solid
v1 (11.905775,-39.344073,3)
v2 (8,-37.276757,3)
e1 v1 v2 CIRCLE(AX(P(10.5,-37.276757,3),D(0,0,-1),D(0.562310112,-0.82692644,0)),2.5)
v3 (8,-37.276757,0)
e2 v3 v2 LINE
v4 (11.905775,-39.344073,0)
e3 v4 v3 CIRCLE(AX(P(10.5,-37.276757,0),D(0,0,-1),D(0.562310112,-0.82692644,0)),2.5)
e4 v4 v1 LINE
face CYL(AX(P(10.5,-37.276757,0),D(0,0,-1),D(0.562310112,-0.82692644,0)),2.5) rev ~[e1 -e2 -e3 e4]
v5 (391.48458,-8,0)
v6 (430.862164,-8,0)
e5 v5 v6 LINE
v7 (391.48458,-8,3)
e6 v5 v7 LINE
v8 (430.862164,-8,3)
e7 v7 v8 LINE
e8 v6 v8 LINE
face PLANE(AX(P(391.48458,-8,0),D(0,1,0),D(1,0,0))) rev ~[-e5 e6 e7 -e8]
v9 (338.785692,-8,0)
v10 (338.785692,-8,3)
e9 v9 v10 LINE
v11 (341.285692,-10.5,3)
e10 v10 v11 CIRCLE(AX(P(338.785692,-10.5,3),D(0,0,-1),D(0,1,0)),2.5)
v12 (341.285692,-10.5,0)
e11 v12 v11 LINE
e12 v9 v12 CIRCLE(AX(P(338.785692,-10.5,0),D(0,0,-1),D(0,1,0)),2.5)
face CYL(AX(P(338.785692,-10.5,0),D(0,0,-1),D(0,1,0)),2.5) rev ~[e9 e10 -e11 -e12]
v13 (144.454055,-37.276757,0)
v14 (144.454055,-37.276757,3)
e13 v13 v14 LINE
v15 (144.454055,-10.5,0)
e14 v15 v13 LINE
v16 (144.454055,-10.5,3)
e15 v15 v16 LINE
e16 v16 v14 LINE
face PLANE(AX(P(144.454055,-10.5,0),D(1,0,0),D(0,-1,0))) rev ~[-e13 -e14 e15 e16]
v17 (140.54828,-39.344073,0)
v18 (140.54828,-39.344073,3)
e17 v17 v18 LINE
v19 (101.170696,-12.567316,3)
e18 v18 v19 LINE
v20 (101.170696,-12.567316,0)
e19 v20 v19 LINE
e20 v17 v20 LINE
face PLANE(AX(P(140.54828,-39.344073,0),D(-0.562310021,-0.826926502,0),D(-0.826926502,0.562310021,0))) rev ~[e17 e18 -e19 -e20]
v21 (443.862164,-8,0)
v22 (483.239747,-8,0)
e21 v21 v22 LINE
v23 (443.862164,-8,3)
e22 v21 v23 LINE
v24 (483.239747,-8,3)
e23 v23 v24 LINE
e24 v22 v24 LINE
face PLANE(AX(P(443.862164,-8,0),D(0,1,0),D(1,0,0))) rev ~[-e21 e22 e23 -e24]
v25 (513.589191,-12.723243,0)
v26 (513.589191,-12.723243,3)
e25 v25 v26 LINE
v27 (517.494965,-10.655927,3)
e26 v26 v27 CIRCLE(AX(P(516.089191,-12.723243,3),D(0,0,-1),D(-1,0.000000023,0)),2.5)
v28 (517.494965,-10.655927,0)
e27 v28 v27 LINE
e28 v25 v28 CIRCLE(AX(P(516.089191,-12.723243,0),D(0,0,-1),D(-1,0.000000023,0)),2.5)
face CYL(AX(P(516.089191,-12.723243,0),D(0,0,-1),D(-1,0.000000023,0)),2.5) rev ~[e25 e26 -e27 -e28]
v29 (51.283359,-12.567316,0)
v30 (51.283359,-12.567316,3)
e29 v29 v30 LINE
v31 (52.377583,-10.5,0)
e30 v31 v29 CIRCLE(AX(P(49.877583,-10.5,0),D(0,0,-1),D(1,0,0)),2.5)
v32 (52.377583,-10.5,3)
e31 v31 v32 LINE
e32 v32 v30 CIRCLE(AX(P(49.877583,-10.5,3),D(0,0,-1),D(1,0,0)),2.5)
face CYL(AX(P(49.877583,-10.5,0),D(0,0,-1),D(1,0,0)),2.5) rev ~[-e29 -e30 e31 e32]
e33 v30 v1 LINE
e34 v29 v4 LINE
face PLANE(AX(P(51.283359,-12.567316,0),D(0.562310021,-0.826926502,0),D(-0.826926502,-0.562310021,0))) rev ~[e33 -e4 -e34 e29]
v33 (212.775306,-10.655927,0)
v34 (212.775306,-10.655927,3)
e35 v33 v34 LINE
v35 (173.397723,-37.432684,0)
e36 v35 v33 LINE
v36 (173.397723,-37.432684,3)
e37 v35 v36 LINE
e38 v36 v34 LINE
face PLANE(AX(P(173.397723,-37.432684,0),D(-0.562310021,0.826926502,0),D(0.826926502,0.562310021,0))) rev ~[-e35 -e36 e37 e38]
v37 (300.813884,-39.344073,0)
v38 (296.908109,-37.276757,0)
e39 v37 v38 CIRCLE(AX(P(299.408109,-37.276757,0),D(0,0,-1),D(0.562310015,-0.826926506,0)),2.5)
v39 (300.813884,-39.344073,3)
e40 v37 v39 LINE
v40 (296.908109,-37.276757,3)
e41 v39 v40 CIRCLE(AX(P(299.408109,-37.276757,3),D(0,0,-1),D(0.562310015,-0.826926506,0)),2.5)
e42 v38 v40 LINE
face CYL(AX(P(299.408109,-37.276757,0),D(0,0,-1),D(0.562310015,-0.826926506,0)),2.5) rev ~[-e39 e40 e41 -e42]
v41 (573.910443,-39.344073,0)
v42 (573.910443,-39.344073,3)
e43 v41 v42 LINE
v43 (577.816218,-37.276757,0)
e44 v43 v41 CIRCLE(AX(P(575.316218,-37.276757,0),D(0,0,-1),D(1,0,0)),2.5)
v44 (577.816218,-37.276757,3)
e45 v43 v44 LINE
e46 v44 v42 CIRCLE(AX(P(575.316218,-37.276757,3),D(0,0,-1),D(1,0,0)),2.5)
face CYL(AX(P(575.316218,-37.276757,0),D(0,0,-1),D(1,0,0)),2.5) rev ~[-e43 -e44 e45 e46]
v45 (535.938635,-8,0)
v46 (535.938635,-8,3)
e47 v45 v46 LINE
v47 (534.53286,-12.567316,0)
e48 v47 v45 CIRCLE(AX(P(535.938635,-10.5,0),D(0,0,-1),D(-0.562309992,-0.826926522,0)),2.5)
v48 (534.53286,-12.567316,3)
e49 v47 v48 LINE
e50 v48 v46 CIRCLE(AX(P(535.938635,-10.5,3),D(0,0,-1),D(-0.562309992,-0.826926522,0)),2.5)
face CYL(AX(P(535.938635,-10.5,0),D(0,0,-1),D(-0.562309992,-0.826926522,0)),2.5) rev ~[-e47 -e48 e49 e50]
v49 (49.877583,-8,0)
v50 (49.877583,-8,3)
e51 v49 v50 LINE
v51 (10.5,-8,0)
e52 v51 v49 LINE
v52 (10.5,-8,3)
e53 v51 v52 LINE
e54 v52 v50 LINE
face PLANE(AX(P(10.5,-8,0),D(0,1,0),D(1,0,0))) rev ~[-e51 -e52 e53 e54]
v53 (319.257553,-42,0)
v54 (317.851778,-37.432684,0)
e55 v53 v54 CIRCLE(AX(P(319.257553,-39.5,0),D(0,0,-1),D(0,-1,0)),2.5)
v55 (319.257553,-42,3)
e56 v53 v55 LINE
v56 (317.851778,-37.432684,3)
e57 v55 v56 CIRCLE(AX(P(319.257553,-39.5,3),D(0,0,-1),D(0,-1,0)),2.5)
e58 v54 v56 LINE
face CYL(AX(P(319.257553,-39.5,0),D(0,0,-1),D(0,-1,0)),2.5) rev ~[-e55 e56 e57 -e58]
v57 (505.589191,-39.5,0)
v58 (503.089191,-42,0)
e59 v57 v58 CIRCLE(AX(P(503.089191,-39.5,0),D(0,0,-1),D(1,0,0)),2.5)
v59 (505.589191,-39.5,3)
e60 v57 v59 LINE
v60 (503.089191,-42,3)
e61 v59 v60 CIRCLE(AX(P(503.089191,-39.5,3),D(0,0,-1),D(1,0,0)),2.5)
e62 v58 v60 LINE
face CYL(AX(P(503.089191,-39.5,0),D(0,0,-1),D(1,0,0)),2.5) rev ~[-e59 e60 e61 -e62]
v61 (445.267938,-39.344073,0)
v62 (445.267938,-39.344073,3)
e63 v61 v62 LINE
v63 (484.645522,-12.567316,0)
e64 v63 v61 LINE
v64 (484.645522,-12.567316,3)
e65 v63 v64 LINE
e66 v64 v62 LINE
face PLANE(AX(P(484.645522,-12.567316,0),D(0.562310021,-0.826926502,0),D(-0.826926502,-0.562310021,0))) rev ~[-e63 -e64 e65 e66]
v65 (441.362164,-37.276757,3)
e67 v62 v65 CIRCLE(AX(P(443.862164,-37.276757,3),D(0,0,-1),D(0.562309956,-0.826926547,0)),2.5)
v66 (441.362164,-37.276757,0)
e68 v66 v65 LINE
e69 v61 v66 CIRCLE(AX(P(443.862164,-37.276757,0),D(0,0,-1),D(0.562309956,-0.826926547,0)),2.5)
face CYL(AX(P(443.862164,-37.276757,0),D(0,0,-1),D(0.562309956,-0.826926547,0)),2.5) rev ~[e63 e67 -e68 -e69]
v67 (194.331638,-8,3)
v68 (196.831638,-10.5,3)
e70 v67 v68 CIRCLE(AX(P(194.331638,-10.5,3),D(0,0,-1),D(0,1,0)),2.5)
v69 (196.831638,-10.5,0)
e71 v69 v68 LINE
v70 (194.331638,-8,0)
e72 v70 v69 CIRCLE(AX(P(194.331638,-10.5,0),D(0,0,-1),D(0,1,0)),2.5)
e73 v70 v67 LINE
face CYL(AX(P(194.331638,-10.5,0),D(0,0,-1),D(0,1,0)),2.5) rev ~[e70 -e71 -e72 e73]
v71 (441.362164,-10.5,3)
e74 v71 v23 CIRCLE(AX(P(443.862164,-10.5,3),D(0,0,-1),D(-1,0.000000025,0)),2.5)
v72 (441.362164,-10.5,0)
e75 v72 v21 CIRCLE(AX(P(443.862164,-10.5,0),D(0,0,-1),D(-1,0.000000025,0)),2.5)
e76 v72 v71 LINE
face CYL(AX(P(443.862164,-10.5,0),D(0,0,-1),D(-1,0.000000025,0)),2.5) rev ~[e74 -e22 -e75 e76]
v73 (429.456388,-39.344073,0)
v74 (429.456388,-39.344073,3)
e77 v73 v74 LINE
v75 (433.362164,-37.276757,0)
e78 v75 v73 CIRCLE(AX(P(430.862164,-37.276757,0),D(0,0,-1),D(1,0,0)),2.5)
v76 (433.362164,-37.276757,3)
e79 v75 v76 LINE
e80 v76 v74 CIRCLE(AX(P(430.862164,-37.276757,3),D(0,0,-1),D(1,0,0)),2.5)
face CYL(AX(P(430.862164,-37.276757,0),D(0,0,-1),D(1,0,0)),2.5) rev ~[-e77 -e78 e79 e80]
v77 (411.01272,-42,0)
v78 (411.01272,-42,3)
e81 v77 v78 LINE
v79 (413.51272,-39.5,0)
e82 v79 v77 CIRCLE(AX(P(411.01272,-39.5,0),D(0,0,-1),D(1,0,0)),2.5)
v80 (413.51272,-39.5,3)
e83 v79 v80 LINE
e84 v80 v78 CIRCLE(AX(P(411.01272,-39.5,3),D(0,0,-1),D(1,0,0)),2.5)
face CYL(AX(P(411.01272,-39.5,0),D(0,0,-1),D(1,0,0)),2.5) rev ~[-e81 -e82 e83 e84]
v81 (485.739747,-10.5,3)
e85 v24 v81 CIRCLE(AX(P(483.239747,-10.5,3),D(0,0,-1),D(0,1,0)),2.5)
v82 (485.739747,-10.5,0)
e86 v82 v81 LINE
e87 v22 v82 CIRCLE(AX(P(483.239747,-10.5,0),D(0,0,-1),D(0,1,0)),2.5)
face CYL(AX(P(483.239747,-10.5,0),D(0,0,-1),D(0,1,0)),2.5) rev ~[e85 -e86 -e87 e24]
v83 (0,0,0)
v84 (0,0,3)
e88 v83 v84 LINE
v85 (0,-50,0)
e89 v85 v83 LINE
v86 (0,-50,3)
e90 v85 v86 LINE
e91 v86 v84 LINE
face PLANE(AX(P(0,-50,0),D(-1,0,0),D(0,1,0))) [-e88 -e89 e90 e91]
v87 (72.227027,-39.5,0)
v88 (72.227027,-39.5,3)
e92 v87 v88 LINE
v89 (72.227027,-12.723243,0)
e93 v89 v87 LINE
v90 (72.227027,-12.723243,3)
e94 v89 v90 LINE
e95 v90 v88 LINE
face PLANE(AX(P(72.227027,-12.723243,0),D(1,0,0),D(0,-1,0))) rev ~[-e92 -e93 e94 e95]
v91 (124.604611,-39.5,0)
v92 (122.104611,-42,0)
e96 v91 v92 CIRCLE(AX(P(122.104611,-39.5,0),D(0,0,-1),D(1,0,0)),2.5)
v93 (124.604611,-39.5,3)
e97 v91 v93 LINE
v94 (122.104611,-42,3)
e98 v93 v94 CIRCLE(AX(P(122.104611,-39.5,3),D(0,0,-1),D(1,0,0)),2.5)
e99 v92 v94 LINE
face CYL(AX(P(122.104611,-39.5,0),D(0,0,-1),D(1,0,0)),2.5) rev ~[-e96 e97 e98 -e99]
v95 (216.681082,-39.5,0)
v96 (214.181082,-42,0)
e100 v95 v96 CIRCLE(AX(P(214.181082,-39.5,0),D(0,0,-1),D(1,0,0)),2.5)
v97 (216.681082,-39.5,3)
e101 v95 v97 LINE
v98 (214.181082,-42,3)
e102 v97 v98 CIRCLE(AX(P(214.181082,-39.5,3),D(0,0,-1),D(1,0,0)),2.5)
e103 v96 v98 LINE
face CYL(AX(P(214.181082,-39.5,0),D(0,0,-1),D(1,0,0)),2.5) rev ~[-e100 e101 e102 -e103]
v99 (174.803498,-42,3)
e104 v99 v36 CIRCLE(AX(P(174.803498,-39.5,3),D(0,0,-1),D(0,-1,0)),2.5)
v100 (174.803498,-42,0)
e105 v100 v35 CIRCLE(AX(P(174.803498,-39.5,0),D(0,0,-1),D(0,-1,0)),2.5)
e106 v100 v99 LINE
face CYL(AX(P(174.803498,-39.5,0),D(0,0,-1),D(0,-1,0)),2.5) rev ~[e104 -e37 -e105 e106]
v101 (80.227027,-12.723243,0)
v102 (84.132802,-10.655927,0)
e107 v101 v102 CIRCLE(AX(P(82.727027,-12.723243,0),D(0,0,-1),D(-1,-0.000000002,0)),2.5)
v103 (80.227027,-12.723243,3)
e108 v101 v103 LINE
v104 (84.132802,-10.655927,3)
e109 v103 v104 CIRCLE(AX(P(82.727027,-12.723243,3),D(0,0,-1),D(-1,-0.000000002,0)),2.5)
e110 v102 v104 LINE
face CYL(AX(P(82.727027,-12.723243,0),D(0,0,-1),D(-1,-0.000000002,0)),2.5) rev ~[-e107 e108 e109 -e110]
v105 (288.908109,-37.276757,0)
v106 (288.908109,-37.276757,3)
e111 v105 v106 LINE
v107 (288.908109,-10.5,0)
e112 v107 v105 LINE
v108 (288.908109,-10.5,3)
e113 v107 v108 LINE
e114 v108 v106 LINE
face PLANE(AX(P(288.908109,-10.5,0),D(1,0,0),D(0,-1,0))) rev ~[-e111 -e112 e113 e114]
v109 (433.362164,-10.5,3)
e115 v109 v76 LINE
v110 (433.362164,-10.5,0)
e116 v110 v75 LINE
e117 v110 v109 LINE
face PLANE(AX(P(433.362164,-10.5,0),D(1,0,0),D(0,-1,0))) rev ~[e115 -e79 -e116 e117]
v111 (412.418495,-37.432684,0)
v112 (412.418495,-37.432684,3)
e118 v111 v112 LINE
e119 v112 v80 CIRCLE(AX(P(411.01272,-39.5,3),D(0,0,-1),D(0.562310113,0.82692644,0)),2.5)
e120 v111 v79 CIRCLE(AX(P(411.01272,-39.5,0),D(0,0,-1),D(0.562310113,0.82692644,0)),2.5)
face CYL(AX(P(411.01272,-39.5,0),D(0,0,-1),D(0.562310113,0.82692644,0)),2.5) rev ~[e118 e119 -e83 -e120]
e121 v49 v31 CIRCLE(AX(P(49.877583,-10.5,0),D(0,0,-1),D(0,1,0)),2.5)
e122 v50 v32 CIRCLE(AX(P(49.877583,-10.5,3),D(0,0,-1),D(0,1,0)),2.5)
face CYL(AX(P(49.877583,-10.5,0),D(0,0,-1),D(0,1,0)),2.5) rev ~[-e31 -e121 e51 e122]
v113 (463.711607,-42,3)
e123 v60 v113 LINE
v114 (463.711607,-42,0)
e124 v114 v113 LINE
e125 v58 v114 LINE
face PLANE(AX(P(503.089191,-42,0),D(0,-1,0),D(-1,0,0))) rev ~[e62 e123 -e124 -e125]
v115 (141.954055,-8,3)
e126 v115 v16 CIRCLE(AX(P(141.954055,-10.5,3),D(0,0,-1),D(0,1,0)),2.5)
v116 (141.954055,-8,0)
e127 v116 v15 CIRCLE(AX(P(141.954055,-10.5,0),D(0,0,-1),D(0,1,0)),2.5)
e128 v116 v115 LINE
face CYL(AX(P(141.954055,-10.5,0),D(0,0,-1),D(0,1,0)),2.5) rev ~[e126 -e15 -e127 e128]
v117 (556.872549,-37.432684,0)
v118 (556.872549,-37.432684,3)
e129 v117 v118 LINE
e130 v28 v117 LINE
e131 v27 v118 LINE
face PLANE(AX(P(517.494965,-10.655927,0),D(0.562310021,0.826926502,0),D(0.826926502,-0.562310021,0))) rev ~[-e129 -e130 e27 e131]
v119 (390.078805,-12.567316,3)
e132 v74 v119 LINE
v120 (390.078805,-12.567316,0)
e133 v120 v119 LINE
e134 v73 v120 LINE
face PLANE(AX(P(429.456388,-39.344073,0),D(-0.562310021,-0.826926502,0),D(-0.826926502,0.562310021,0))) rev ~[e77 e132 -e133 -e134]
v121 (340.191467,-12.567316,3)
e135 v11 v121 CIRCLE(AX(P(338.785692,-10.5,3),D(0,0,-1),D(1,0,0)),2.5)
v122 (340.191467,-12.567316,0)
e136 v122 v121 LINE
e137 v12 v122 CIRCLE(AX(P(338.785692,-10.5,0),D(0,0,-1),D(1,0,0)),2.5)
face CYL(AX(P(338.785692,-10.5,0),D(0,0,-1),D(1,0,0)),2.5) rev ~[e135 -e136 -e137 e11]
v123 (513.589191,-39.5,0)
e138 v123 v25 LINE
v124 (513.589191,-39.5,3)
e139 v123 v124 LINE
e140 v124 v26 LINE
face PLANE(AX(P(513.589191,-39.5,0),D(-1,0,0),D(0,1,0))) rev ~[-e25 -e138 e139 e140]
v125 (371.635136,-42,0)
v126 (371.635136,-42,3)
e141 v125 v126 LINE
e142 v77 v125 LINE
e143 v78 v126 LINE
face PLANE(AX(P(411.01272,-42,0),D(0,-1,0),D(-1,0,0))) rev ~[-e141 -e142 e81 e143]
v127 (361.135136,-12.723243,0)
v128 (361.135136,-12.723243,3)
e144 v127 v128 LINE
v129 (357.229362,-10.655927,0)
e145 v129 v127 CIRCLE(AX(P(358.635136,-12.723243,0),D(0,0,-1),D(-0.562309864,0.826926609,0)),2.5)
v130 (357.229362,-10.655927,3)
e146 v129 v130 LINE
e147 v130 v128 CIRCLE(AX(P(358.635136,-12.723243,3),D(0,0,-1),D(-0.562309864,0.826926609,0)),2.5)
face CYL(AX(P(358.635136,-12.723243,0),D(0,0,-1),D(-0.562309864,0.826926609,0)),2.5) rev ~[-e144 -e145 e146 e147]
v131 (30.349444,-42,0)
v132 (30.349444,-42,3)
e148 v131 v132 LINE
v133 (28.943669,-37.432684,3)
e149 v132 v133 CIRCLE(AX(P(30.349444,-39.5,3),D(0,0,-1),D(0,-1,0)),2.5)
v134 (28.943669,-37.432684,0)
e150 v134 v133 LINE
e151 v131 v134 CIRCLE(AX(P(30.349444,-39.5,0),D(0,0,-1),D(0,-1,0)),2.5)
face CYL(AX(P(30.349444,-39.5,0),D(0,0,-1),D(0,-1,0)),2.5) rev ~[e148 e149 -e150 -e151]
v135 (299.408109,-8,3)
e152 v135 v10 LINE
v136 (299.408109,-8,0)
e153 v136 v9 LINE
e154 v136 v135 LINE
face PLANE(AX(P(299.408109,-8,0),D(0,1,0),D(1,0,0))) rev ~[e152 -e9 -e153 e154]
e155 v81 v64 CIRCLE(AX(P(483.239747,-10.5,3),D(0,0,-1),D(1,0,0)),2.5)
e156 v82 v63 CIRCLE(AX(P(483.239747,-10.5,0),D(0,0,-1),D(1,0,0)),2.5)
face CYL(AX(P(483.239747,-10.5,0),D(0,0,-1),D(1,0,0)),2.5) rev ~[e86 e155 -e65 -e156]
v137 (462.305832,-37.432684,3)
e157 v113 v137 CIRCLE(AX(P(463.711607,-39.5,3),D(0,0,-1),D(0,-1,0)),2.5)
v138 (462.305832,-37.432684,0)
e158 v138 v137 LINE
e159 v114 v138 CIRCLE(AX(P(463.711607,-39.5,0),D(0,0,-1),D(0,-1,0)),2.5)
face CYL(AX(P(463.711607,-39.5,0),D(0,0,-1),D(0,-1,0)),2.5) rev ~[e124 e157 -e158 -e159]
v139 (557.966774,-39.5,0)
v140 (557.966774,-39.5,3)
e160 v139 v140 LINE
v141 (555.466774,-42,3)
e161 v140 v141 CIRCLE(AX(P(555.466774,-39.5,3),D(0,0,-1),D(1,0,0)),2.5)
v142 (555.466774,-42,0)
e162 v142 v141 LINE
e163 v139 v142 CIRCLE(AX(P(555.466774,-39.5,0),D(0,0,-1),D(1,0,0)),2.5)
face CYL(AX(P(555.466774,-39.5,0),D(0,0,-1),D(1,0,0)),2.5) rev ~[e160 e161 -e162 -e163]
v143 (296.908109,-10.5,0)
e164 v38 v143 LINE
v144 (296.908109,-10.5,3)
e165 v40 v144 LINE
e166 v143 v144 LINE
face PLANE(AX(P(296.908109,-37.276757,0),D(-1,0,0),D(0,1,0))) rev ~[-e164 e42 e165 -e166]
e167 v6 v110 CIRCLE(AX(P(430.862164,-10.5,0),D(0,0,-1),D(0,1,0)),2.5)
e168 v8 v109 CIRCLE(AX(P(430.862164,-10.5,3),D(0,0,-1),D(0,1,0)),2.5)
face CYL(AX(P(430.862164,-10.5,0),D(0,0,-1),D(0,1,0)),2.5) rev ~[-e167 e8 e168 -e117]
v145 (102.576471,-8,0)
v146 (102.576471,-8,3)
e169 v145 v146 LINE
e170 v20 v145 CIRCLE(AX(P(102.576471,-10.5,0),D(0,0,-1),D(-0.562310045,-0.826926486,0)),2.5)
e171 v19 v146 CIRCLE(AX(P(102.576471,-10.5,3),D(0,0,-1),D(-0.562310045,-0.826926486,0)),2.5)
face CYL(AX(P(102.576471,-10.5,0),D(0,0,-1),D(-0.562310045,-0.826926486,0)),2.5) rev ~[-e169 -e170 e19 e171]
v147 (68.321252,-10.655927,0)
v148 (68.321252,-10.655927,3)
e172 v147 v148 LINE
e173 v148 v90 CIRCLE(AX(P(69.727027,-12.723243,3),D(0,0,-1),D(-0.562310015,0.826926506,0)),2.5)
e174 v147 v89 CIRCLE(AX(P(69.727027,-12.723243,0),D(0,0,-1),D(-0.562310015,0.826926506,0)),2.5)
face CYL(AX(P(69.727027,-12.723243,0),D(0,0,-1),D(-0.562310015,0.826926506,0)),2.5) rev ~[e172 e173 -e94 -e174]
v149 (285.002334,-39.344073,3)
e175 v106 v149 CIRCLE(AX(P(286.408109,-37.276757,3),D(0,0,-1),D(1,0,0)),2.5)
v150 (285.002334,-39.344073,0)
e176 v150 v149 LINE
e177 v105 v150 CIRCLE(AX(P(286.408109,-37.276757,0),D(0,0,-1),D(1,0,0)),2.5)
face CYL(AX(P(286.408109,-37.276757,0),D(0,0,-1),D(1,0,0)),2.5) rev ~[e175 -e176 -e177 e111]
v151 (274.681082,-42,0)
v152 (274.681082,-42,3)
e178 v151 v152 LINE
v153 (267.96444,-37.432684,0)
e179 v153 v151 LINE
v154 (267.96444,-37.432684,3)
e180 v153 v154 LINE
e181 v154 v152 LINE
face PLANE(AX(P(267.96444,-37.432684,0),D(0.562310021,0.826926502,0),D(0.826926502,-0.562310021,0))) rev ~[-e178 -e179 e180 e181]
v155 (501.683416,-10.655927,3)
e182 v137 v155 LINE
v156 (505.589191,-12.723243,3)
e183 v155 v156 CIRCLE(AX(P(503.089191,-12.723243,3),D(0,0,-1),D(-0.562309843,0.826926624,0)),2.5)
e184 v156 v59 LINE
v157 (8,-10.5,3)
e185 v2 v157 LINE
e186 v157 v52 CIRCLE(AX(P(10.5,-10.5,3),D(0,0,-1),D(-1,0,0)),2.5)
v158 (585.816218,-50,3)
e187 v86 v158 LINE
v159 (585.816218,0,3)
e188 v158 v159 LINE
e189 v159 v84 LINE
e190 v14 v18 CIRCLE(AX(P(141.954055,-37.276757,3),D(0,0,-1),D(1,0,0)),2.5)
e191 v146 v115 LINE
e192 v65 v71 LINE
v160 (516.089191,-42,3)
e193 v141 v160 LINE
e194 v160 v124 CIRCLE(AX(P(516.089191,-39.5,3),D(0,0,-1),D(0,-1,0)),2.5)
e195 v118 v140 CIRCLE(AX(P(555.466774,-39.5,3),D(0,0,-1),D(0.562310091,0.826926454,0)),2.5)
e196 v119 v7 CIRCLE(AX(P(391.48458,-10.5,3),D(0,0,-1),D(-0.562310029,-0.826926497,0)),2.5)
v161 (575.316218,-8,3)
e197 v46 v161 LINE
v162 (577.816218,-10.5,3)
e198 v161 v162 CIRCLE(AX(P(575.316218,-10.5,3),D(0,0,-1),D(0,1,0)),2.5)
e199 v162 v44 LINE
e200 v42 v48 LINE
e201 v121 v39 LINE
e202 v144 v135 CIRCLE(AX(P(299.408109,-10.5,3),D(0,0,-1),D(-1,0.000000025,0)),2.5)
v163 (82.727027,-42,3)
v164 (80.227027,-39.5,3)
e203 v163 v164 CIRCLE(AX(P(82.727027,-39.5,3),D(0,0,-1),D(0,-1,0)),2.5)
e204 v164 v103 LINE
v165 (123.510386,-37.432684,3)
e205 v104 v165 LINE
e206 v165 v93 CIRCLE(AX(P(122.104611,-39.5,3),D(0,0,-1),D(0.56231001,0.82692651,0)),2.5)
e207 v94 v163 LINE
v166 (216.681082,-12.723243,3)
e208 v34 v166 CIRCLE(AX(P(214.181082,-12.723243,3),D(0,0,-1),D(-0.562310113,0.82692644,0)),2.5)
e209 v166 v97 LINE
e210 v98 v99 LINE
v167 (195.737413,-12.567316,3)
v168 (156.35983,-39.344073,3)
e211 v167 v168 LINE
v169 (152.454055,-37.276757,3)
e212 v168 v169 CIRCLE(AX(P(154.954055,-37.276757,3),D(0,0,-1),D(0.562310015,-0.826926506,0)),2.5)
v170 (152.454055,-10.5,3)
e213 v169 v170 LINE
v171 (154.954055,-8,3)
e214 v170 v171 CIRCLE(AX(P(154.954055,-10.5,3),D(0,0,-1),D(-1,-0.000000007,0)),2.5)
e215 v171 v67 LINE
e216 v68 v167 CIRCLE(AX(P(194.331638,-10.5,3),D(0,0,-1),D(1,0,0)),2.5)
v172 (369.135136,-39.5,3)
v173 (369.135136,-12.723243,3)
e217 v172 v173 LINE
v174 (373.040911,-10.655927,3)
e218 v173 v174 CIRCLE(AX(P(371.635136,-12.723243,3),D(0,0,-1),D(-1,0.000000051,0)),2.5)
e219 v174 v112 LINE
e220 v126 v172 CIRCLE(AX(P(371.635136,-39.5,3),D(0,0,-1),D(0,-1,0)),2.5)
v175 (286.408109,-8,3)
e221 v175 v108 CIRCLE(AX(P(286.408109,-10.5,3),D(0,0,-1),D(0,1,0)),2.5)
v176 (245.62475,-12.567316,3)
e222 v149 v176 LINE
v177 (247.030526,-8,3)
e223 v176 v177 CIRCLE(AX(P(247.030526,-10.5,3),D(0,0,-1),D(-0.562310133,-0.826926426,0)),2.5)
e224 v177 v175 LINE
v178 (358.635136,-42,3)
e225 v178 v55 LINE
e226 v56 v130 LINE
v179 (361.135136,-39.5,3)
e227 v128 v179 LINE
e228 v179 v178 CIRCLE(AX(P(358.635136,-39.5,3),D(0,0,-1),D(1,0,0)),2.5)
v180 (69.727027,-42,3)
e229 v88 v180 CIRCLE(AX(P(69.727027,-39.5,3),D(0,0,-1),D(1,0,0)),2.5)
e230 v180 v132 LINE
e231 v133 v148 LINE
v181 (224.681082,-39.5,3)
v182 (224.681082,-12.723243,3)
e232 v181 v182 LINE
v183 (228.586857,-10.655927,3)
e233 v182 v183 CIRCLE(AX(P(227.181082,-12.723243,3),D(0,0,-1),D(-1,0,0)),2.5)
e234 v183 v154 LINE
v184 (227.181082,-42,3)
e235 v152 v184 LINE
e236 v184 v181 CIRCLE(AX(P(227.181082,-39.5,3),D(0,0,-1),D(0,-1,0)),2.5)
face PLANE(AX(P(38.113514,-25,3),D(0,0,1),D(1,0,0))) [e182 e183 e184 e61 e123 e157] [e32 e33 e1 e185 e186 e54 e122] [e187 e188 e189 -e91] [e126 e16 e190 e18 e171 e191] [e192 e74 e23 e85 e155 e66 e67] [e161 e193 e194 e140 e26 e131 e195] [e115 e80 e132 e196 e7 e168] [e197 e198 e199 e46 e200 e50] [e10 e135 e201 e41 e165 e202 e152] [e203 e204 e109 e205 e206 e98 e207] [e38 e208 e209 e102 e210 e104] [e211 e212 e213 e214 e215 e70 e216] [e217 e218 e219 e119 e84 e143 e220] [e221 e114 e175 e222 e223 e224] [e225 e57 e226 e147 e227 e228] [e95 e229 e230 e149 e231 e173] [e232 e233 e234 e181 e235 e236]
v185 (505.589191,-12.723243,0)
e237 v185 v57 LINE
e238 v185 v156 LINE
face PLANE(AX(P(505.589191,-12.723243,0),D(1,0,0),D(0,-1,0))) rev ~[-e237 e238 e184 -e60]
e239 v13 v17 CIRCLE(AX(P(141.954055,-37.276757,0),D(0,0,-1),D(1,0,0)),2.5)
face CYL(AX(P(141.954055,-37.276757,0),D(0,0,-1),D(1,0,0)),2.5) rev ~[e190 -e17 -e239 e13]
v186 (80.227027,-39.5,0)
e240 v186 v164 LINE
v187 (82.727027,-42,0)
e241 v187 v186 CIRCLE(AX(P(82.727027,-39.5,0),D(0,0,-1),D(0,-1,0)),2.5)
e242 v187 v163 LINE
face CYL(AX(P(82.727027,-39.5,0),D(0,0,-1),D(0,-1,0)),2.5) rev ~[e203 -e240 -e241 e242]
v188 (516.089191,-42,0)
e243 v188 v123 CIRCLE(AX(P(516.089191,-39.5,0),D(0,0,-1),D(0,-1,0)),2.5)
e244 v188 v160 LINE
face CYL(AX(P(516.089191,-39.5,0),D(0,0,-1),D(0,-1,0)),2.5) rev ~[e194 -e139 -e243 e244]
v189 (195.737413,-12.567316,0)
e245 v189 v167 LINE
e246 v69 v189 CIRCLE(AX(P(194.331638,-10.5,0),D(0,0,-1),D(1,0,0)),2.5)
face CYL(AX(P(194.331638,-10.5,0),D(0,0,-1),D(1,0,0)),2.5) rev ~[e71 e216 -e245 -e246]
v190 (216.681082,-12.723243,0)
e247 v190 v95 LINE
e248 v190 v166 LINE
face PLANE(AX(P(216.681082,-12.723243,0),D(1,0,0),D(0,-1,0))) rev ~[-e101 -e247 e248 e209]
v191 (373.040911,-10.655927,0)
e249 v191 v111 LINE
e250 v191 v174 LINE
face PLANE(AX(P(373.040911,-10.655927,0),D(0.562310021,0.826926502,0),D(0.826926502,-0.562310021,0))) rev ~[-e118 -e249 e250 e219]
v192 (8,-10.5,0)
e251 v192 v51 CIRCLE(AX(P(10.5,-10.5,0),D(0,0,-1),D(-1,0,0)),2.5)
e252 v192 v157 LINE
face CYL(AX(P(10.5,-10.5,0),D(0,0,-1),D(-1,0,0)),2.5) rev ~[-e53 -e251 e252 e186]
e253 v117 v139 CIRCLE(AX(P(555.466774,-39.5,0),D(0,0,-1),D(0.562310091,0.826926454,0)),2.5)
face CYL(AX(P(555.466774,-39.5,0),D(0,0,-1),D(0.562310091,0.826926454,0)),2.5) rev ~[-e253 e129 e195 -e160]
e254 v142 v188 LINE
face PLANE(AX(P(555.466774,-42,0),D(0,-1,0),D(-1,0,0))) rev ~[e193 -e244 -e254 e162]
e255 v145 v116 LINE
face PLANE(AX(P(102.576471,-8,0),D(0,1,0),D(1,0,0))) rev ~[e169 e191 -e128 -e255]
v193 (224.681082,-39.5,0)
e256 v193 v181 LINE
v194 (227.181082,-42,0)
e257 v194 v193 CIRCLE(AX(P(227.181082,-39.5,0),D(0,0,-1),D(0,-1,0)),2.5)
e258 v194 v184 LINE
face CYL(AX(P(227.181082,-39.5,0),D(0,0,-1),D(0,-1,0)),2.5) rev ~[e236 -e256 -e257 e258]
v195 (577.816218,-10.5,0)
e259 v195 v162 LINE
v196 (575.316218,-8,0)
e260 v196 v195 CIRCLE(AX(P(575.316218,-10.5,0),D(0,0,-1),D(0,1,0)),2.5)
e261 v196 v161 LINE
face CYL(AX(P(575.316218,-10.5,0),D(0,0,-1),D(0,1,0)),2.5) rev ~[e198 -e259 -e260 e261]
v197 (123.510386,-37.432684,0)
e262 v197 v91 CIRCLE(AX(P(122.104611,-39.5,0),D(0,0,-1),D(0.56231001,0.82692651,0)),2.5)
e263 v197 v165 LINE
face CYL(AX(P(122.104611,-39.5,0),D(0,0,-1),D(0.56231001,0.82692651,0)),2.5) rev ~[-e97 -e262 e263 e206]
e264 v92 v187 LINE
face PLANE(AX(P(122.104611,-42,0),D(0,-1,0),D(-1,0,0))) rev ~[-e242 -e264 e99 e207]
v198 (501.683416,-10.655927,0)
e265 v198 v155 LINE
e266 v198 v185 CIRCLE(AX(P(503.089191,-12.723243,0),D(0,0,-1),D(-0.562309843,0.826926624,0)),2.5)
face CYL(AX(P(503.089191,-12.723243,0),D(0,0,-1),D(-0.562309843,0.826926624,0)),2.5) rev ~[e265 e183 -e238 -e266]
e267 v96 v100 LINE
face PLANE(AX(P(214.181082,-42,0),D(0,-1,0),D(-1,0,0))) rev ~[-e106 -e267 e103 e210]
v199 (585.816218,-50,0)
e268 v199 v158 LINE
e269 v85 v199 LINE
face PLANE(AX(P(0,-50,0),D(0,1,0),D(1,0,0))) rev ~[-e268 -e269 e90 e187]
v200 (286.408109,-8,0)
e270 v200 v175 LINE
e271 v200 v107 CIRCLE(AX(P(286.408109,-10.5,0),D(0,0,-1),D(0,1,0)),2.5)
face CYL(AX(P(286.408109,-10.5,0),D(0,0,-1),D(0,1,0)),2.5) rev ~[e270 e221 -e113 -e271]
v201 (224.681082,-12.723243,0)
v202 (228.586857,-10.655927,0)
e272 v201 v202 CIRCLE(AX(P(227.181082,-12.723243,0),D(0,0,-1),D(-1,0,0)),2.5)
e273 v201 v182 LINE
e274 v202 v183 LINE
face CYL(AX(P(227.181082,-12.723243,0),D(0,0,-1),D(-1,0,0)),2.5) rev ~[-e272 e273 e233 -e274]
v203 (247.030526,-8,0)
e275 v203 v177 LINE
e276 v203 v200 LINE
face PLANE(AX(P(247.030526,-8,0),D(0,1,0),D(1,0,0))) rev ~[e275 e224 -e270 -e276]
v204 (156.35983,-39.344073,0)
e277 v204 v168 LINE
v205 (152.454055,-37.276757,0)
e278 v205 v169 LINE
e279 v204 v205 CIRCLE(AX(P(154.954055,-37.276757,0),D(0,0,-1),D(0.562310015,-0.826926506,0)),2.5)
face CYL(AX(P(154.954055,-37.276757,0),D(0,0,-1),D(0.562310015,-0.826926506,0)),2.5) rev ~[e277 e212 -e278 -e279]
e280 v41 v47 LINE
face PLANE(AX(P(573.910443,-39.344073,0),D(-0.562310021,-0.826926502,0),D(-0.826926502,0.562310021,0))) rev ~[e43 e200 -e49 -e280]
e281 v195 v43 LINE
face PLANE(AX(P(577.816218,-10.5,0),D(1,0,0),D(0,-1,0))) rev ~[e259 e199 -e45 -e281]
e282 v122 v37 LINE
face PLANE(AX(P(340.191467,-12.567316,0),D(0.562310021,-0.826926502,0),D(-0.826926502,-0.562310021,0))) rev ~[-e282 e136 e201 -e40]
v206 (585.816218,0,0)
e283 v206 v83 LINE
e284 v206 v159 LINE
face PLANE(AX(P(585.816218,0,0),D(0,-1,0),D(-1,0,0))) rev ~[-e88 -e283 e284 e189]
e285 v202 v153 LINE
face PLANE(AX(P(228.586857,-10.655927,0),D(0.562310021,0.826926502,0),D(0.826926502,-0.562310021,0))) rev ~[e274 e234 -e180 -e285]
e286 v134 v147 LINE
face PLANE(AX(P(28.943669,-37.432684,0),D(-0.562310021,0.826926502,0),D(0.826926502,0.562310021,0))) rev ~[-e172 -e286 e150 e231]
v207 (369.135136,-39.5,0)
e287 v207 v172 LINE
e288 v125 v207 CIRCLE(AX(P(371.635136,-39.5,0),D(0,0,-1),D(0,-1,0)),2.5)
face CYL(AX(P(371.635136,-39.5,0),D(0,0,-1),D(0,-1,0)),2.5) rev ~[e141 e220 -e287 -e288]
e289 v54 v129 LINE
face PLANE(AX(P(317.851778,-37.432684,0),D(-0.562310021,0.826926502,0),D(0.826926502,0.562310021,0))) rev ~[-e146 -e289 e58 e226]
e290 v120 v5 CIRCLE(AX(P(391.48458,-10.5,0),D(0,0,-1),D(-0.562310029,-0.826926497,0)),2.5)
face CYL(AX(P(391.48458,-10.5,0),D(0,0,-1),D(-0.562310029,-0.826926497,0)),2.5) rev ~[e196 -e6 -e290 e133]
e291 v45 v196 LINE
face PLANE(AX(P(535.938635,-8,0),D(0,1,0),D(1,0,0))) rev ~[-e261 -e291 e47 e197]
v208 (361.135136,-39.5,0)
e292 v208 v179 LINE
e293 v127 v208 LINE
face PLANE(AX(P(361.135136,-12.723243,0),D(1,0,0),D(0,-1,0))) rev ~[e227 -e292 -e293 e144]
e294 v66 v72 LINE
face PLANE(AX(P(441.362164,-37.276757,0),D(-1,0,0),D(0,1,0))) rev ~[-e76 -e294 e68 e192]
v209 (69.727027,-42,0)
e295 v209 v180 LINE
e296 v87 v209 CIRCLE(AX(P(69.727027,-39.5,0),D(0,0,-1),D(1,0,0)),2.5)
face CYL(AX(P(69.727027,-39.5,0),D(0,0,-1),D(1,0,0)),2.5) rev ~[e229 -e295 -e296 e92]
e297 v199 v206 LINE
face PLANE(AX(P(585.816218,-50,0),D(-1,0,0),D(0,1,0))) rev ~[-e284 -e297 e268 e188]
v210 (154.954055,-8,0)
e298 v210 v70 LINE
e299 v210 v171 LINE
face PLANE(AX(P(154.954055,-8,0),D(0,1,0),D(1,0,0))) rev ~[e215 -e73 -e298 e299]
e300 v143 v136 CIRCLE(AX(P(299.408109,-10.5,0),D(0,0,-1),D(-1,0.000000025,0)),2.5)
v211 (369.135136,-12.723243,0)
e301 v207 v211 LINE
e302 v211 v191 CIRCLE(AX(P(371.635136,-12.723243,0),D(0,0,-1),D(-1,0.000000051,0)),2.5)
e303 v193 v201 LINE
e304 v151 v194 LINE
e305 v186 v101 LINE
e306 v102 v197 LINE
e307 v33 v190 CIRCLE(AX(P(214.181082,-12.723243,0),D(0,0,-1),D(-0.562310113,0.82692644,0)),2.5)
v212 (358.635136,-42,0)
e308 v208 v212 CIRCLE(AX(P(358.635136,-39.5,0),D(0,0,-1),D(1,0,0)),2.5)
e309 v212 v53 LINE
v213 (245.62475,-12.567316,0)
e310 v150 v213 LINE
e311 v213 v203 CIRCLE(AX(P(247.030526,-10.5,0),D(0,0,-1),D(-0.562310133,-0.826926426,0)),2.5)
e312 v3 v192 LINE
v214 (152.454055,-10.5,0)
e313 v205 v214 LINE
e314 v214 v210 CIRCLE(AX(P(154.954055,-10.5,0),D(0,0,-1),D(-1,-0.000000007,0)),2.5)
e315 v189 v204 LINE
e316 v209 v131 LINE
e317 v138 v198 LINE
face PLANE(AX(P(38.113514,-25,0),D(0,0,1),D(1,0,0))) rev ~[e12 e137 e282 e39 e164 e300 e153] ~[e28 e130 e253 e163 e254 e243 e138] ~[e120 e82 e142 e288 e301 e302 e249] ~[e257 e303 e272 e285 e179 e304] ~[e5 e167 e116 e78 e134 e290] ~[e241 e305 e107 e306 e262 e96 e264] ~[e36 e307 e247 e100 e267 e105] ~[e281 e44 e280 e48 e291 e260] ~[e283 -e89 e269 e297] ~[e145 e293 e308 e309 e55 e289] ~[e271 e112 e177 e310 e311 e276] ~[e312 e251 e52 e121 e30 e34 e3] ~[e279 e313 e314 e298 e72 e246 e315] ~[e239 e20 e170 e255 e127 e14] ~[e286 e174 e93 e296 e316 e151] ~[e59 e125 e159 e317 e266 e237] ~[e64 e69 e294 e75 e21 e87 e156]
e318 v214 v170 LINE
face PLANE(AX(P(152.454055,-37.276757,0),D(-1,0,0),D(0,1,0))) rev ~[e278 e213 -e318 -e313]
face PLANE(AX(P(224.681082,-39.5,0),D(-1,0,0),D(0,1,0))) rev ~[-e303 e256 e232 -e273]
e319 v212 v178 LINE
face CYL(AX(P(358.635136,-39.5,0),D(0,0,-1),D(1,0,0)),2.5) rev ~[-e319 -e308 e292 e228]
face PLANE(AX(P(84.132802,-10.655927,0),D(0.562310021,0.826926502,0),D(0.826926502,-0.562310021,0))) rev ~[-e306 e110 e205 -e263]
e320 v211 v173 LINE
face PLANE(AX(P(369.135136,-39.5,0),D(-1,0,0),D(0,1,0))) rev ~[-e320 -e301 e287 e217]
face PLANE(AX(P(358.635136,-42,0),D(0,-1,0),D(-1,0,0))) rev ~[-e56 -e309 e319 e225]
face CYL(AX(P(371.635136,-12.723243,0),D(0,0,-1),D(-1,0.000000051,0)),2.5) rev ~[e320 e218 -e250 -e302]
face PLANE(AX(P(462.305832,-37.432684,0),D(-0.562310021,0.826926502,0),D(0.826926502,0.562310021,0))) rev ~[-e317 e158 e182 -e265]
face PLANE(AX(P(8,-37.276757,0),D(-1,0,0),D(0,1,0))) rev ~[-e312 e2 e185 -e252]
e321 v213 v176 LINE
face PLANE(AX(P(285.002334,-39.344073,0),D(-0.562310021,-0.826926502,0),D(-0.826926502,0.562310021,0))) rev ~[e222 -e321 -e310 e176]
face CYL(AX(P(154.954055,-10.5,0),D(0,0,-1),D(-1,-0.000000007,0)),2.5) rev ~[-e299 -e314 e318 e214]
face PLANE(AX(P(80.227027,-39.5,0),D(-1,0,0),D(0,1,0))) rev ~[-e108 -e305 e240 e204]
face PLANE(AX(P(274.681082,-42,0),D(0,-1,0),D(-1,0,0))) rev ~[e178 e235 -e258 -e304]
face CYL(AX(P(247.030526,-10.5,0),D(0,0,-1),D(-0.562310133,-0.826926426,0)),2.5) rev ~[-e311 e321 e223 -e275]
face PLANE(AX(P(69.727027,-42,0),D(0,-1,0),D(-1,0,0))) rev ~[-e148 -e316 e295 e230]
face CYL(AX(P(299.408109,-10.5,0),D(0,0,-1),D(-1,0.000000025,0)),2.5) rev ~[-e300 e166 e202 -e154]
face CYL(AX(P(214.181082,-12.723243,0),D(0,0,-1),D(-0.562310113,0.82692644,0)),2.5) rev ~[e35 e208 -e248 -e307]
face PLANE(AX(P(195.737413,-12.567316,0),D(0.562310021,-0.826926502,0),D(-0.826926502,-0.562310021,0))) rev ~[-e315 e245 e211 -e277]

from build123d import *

# Parameters (mm, degrees)
F0_W     = 76.2270272544
F0_H     = 50
F1_DEPTH = 3


# Not quite as in the source:
# - a feature names something its author has since deleted; it is built from what else it names


with BuildPart() as f1:
    # F0 (on Top) → F1 (new body)
    with BuildSketch(Plane.XY):
        with Locations((38.1135136272, -25)):
            Rectangle(F0_W, F0_H)
        Polygon((8, -10.5), (8, -8), (10.5, -8), (49.8775833948, -8), (58, -8), (51.2833586059, -12.567316148), (11.9057752805, -39.3440728093), (8, -42), (8, -37.2767567084), align=None, mode=Mode.SUBTRACT)
        Polygon((68.3212522165, -10.6559270258), (72.2270272544, -8), (72.2270272544, -12.7232432916), (72.2270272544, -39.5), (72.2270272544, -42), (69.7270272544, -42), (30.3494438597, -42), (22.2270272544, -42), (28.9436687283, -37.4326837978), align=None, mode=Mode.SUBTRACT)
        Polygon((144.4540545089, 0), (76.2270272544, 0), (76.2270272544, -50), (144.4540545089, -50), (144.4540545089, -42), (140.5482796221, -39.344073077), (101.1706960016, -12.567316215), (94.4540545089, -8), (102.5764711141, -8), (141.9540545089, -8), (144.4540545089, -8), align=None)
        Polygon((80.2270272544, -8), (84.1328023313, -10.6559270523), (123.5103856735, -37.432683725), (130.2270272544, -42), (122.1046106492, -42), (82.7270272544, -42), (80.2270272544, -42), (80.2270272544, -39.5), (80.2270272544, -12.7232432967), align=None, mode=Mode.SUBTRACT)
        Polygon((152.4540545089, 0), (144.4540545089, 0), (144.4540545089, -8), (144.4540545089, -10.5), (144.4540545089, -37.2767567084), (144.4540545089, -42), (144.4540545089, -50), (152.4540545089, -50), (152.4540545089, -42), (152.4540545089, -37.2767567084), (152.4540545089, -10.5000000175), (152.4540545089, -8), align=None)
        Polygon((220.6810817633, 0), (152.4540545089, 0), (152.4540545089, -8), (154.9540545089, -8), (194.3316379036, -8), (202.4540545089, -8), (195.7374131063, -12.5673161537), (156.3598295468, -39.3440729742), (152.4540545089, -42), (152.4540545089, -50), (220.6810817633, -50), align=None)
        Polygon((212.7753064808, -10.6559271921), (216.6810817633, -8), (216.6810817633, -12.7232432916), (216.6810817633, -39.5), (216.6810817633, -42), (214.1810817633, -42), (174.8034983685, -42), (166.6810817633, -42), (173.3977233306, -37.4326837343), align=None, mode=Mode.SUBTRACT)
        with BuildLine():
            Line((144.4540545089, -10.5), (144.4540545089, -8))
            Line((144.4540545089, -8), (141.9540545089, -8))
            ThreePointArc((141.9540545089, -8), (143.7218214618, -8.732233047), (144.4540545089, -10.5))
        make_face()
        with BuildLine():
            Line((140.5482796221, -39.344073077), (144.4540545089, -42))
            Line((144.4540545089, -42), (144.4540545089, -37.2767567084))
            ThreePointArc((144.4540545089, -37.2767567084), (143.1235763734, -39.4863310132), (140.5482796221, -39.344073077))
        make_face()
        with BuildLine():
            Line((154.9540545089, -8), (152.4540545089, -8))
            Line((152.4540545089, -8), (152.4540545089, -10.5000000175))
            ThreePointArc((152.4540545089, -10.5000000175), (153.1862875497, -8.7322330532), (154.9540545089, -8))
        make_face()
        Polygon((288.9081090177, 0), (220.6810817633, 0), (220.6810817633, -50), (288.9081090177, -50), (288.9081090177, -42), (285.0023339882, -39.3440729799), (245.6247502909, -12.5673160658), (238.9081090177, -8), (247.030525623, -8), (286.4081090177, -8), (288.9081090177, -8), align=None)
        Polygon((224.6810817633, -8), (228.5868569969, -10.6559271589), (267.964440196, -37.4326837343), (274.6810817633, -42), (266.558665158, -42), (227.1810817633, -42), (224.6810817633, -42), (224.6810817633, -39.5), (224.6810817633, -12.7232432916), align=None, mode=Mode.SUBTRACT)
        with BuildLine():
            Line((152.4540545089, -37.2767567084), (152.4540545089, -42))
            Line((152.4540545089, -42), (156.3598295468, -39.3440729742))
            ThreePointArc((156.3598295468, -39.3440729742), (153.7845327252, -39.486331056), (152.4540545089, -37.2767567084))
        make_face()
        Polygon((296.9081090177, 0), (288.9081090177, 0), (288.9081090177, -8), (288.9081090177, -10.5), (288.9081090177, -37.2767567084), (288.9081090177, -42), (288.9081090177, -50), (296.9081090177, -50), (296.9081090177, -42), (296.9081090177, -37.2767567084), (296.9081090177, -10.4999999368), (296.9081090177, -8), align=None)
        with BuildLine():
            ThreePointArc((101.1706960016, -12.567316215), (100.1870893387, -9.7645717362), (102.5764711141, -8))
            Line((102.5764711141, -8), (94.4540545089, -8))
            Line((94.4540545089, -8), (101.1706960016, -12.567316215))
        make_face()
        with BuildLine():
            Line((202.4540545089, -8), (194.3316379036, -8))
            ThreePointArc((194.3316379036, -8), (196.0994048566, -8.732233047), (196.8316379036, -10.5))
            ThreePointArc((196.8316379036, -10.5), (196.5412122978, -11.6695216957), (195.7374131063, -12.5673161537))
            Line((195.7374131063, -12.5673161537), (202.4540545089, -8))
        make_face()
        Polygon((365.1351362721, 0), (296.9081090177, 0), (296.9081090177, -8), (299.4081090177, -8), (338.7856924125, -8), (346.9081090177, -8), (340.1914674861, -12.5673162415), (300.8138840557, -39.3440729742), (296.9081090177, -42), (296.9081090177, -50), (365.1351362721, -50), align=None)
        Polygon((357.2293616111, -10.6559267695), (361.1351362721, -8), (361.1351362721, -12.7232432916), (361.1351362721, -39.5), (361.1351362721, -42), (358.6351362721, -42), (319.2575528774, -42), (311.1351362721, -42), (317.8517779905, -37.4326836315), align=None, mode=Mode.SUBTRACT)
        with BuildLine():
            Line((288.9081090177, -10.5), (288.9081090177, -8))
            Line((288.9081090177, -8), (286.4081090177, -8))
            ThreePointArc((286.4081090177, -8), (288.1758759707, -8.732233047), (288.9081090177, -10.5))
        make_face()
        with BuildLine():
            Line((285.0023339882, -39.3440729799), (288.9081090177, -42))
            Line((288.9081090177, -42), (288.9081090177, -37.2767567084))
            ThreePointArc((288.9081090177, -37.2767567084), (287.5776308059, -39.4863310536), (285.0023339882, -39.3440729799))
        make_face()
        with BuildLine():
            Line((299.4081090177, -8), (296.9081090177, -8))
            Line((296.9081090177, -8), (296.9081090177, -10.4999999368))
            ThreePointArc((296.9081090177, -10.4999999368), (297.6403420871, -8.7322330247), (299.4081090177, -8))
        make_face()
        Polygon((433.3621635266, 0), (365.1351362721, 0), (365.1351362721, -50), (433.3621635266, -50), (433.3621635266, -42), (429.4563884885, -39.3440729741), (390.0788050582, -12.5673162415), (383.3621635266, -8), (391.4845801318, -8), (430.8621635266, -8), (433.3621635266, -8), align=None)
        Polygon((369.1351362721, -8), (373.0409110624, -10.6559268574), (412.4184949494, -37.4326839005), (419.1351362721, -42), (411.0127196669, -42), (371.6351362721, -42), (369.1351362721, -42), (369.1351362721, -39.5), (369.1351362721, -12.7232431652), align=None, mode=Mode.SUBTRACT)
        with BuildLine():
            Line((296.9081090177, -37.2767567084), (296.9081090177, -42))
            Line((296.9081090177, -42), (300.8138840557, -39.3440729742))
            ThreePointArc((300.8138840557, -39.3440729742), (298.238587234, -39.486331056), (296.9081090177, -37.2767567084))
        make_face()
        Polygon((441.3621635266, 0), (433.3621635266, 0), (433.3621635266, -8), (433.3621635266, -10.5), (433.3621635266, -37.2767567084), (433.3621635266, -42), (433.3621635266, -50), (441.3621635266, -50), (441.3621635266, -42), (441.3621635266, -37.2767567084), (441.3621635266, -10.4999999368), (441.3621635266, -8), align=None)
        with BuildLine():
            ThreePointArc((245.6247502909, -12.5673160658), (244.6411438866, -9.7645716093), (247.030525623, -8))
            Line((247.030525623, -8), (238.9081090177, -8))
            Line((238.9081090177, -8), (245.6247502909, -12.5673160658))
        make_face()
        with BuildLine():
            Line((346.9081090177, -8), (338.7856924125, -8))
            ThreePointArc((338.7856924125, -8), (340.5534593654, -8.732233047), (341.2856924125, -10.5))
            ThreePointArc((341.2856924125, -10.5), (340.9952667701, -11.6695217646), (340.1914674861, -12.5673162415))
            Line((340.1914674861, -12.5673162415), (346.9081090177, -8))
        make_face()
        Polygon((509.589190781, 0), (441.3621635266, 0), (441.3621635266, -8), (443.8621635266, -8), (483.2397469213, -8), (491.3621635266, -8), (484.6455219371, -12.5673162808), (445.2679384166, -39.3440730748), (441.3621635266, -42), (441.3621635266, -50), (509.589190781, -50), align=None)
        Polygon((501.6834161743, -10.6559267325), (505.589190781, -8), (505.589190781, -12.7232432916), (505.589190781, -39.5), (505.589190781, -42), (503.089190781, -42), (463.7116073862, -42), (455.589190781, -42), (462.3058321038, -37.4326839005), align=None, mode=Mode.SUBTRACT)
        with BuildLine():
            Line((433.3621635266, -10.5), (433.3621635266, -8))
            Line((433.3621635266, -8), (430.8621635266, -8))
            ThreePointArc((430.8621635266, -8), (432.6299304795, -8.732233047), (433.3621635266, -10.5))
        make_face()
        with BuildLine():
            Line((429.4563884885, -39.3440729741), (433.3621635266, -42))
            Line((433.3621635266, -42), (433.3621635266, -37.2767567084))
            ThreePointArc((433.3621635266, -37.2767567084), (432.0316853102, -39.486331056), (429.4563884885, -39.3440729741))
        make_face()
        with BuildLine():
            Line((443.8621635266, -8), (441.3621635266, -8))
            Line((441.3621635266, -8), (441.3621635266, -10.4999999368))
            ThreePointArc((441.3621635266, -10.4999999368), (442.0943965959, -8.7322330247), (443.8621635266, -8))
        make_face()
        with Locations((547.7027044082, -25)):
            Rectangle(F0_W, F0_H)
        Polygon((513.589190781, -8), (517.4949653468, -10.6559267047), (556.8725494042, -37.4326838638), (563.589190781, -42), (555.4667741758, -42), (516.089190781, -42), (513.589190781, -42), (513.589190781, -39.5), (513.589190781, -12.723243235), align=None, mode=Mode.SUBTRACT)
        Polygon((577.8162180354, -8), (577.8162180354, -10.5), (577.8162180354, -37.2767567084), (577.8162180354, -42), (573.9104428468, -39.3440728717), (534.5328596602, -12.5673163048), (527.8162180354, -8), (535.9386346407, -8), (575.3162180354, -8), align=None, mode=Mode.SUBTRACT)
        with BuildLine():
            Line((441.3621635266, -37.2767567084), (441.3621635266, -42))
            Line((441.3621635266, -42), (445.2679384166, -39.3440730748))
            ThreePointArc((445.2679384166, -39.3440730748), (442.6926416638, -39.4863310142), (441.3621635266, -37.2767567084))
        make_face()
        with BuildLine():
            ThreePointArc((390.0788050582, -12.5673162415), (389.0951983495, -9.7645717587), (391.4845801318, -8))
            Line((391.4845801318, -8), (383.3621635266, -8))
            Line((383.3621635266, -8), (390.0788050582, -12.5673162415))
        make_face()
        with BuildLine():
            Line((491.3621635266, -8), (483.2397469213, -8))
            ThreePointArc((483.2397469213, -8), (485.0075138743, -8.732233047), (485.7397469213, -10.5))
            ThreePointArc((485.7397469213, -10.5), (485.4493212626, -11.6695217955), (484.6455219371, -12.5673162808))
            Line((484.6455219371, -12.5673162808), (491.3621635266, -8))
        make_face()
        with BuildLine():
            Line((10.5, -8), (8, -8))
            Line((8, -8), (8, -10.5))
            ThreePointArc((8, -10.5), (8.732233047, -8.732233047), (10.5, -8))
        make_face()
        with BuildLine():
            Line((58, -8), (49.8775833948, -8))
            ThreePointArc((49.8775833948, -8), (51.6453503477, -8.732233047), (52.3775833948, -10.5))
            ThreePointArc((52.3775833948, -10.5), (52.0871577913, -11.6695216912), (51.2833586059, -12.567316148))
            Line((51.2833586059, -12.567316148), (58, -8))
        make_face()
        with BuildLine():
            ThreePointArc((11.9057752805, -39.3440728093), (9.3304783459, -39.4863311246), (8, -37.2767567084))
            Line((8, -37.2767567084), (8, -42))
            Line((8, -42), (11.9057752805, -39.3440728093))
        make_face()
        with BuildLine():
            Line((72.2270272544, -12.7232432916), (72.2270272544, -8))
            Line((72.2270272544, -8), (68.3212522165, -10.6559270258))
            ThreePointArc((68.3212522165, -10.6559270258), (70.8965490381, -10.513668944), (72.2270272544, -12.7232432916))
        make_face()
        with BuildLine():
            ThreePointArc((30.3494438597, -42), (27.9600620876, -40.2354282747), (28.9436687283, -37.4326837978))
            Line((28.9436687283, -37.4326837978), (22.2270272544, -42))
            Line((22.2270272544, -42), (30.3494438597, -42))
        make_face()
        with BuildLine():
            Line((72.2270272544, -42), (72.2270272544, -39.5))
            ThreePointArc((72.2270272544, -39.5), (71.4947942074, -41.267766953), (69.7270272544, -42))
            Line((69.7270272544, -42), (72.2270272544, -42))
        make_face()
        with BuildLine():
            ThreePointArc((80.2270272544, -12.7232432967), (81.5575054893, -10.5136689342), (84.1328023313, -10.6559270523))
            Line((84.1328023313, -10.6559270523), (80.2270272544, -8))
            Line((80.2270272544, -8), (80.2270272544, -12.7232432967))
        make_face()
        with BuildLine():
            Line((130.2270272544, -42), (123.5103856735, -37.432683725))
            ThreePointArc((123.5103856735, -37.432683725), (124.3141849929, -38.330478209), (124.6046106492, -39.5))
            ThreePointArc((124.6046106492, -39.5), (123.8723776022, -41.267766953), (122.1046106492, -42))
            Line((122.1046106492, -42), (130.2270272544, -42))
        make_face()
        with BuildLine():
            ThreePointArc((82.7270272544, -42), (80.9592603015, -41.267766953), (80.2270272544, -39.5))
            Line((80.2270272544, -39.5), (80.2270272544, -42))
            Line((80.2270272544, -42), (82.7270272544, -42))
        make_face()
        with BuildLine():
            Line((216.6810817633, -12.7232432916), (216.6810817633, -8))
            Line((216.6810817633, -8), (212.7753064808, -10.6559271921))
            ThreePointArc((212.7753064808, -10.6559271921), (215.3506034163, -10.5136688748), (216.6810817633, -12.7232432916))
        make_face()
        with BuildLine():
            ThreePointArc((174.8034983685, -42), (172.4141165798, -40.2354282207), (173.3977233306, -37.4326837343))
            Line((173.3977233306, -37.4326837343), (166.6810817633, -42))
            Line((166.6810817633, -42), (174.8034983685, -42))
        make_face()
        with BuildLine():
            Line((216.6810817633, -42), (216.6810817633, -39.5))
            ThreePointArc((216.6810817633, -39.5), (215.9488487163, -41.267766953), (214.1810817633, -42))
            Line((214.1810817633, -42), (216.6810817633, -42))
        make_face()
        with BuildLine():
            ThreePointArc((224.6810817633, -12.7232432916), (226.0115600842, -10.5136688886), (228.5868569969, -10.6559271589))
            Line((228.5868569969, -10.6559271589), (224.6810817633, -8))
            Line((224.6810817633, -8), (224.6810817633, -12.7232432916))
        make_face()
        with BuildLine():
            ThreePointArc((227.1810817633, -42), (225.4133148103, -41.267766953), (224.6810817633, -39.5))
            Line((224.6810817633, -39.5), (224.6810817633, -42))
            Line((224.6810817633, -42), (227.1810817633, -42))
        make_face()
        with BuildLine():
            Line((361.1351362721, -12.7232432916), (361.1351362721, -8))
            Line((361.1351362721, -8), (357.2293616111, -10.6559267695))
            ThreePointArc((357.2293616111, -10.6559267695), (359.8046582573, -10.5136690506), (361.1351362721, -12.7232432916))
        make_face()
        with BuildLine():
            ThreePointArc((319.2575528774, -42), (316.8681710618, -40.2354281334), (317.8517779905, -37.4326836315))
            Line((317.8517779905, -37.4326836315), (311.1351362721, -42))
            Line((311.1351362721, -42), (319.2575528774, -42))
        make_face()
        with BuildLine():
            Line((361.1351362721, -42), (361.1351362721, -39.5))
            ThreePointArc((361.1351362721, -39.5), (360.4029032251, -41.267766953), (358.6351362721, -42))
            Line((358.6351362721, -42), (361.1351362721, -42))
        make_face()
        with BuildLine():
            ThreePointArc((369.1351362721, -12.7232431652), (370.4656144119, -10.5136689845), (373.0409110624, -10.6559268574))
            Line((373.0409110624, -10.6559268574), (369.1351362721, -8))
            Line((369.1351362721, -8), (369.1351362721, -12.7232431652))
        make_face()
        with BuildLine():
            Line((419.1351362721, -42), (412.4184949494, -37.4326839005))
            ThreePointArc((412.4184949494, -37.4326839005), (413.2222940836, -38.330478347), (413.5127196669, -39.5))
            ThreePointArc((413.5127196669, -39.5), (412.7804866199, -41.267766953), (411.0127196669, -42))
            Line((411.0127196669, -42), (419.1351362721, -42))
        make_face()
        with BuildLine():
            ThreePointArc((371.6351362721, -42), (369.8673693192, -41.267766953), (369.1351362721, -39.5))
            Line((369.1351362721, -39.5), (369.1351362721, -42))
            Line((369.1351362721, -42), (371.6351362721, -42))
        make_face()
        with BuildLine():
            Line((505.589190781, -12.7232432916), (505.589190781, -8))
            Line((505.589190781, -8), (501.6834161743, -10.6559267325))
            ThreePointArc((501.6834161743, -10.6559267325), (504.2587127952, -10.513669066), (505.589190781, -12.7232432916))
        make_face()
        with BuildLine():
            ThreePointArc((463.7116073862, -42), (461.322225641, -40.235428362), (462.3058321038, -37.4326839005))
            Line((462.3058321038, -37.4326839005), (455.589190781, -42))
            Line((455.589190781, -42), (463.7116073862, -42))
        make_face()
        with BuildLine():
            Line((505.589190781, -42), (505.589190781, -39.5))
            ThreePointArc((505.589190781, -39.5), (504.856957734, -41.267766953), (503.089190781, -42))
            Line((503.089190781, -42), (505.589190781, -42))
        make_face()
        with BuildLine():
            ThreePointArc((575.3162180354, -8), (577.0839849884, -8.732233047), (577.8162180354, -10.5))
            Line((577.8162180354, -10.5), (577.8162180354, -8))
            Line((577.8162180354, -8), (575.3162180354, -8))
        make_face()
        with BuildLine():
            Line((577.8162180354, -42), (577.8162180354, -37.2767567084))
            ThreePointArc((577.8162180354, -37.2767567084), (576.4857397386, -39.4863310986), (573.9104428468, -39.3440728717))
            Line((573.9104428468, -39.3440728717), (577.8162180354, -42))
        make_face()
        with BuildLine():
            ThreePointArc((534.5328596602, -12.5673163048), (533.5492528418, -9.7645718125), (535.9386346407, -8))
            Line((535.9386346407, -8), (527.8162180354, -8))
            Line((527.8162180354, -8), (534.5328596602, -12.5673163048))
        make_face()
        with BuildLine():
            ThreePointArc((513.589190781, -12.723243235), (514.91966877, -10.5136690643), (517.4949653468, -10.6559267047))
            Line((517.4949653468, -10.6559267047), (513.589190781, -8))
            Line((513.589190781, -8), (513.589190781, -12.723243235))
        make_face()
        with BuildLine():
            Line((563.589190781, -42), (556.8725494042, -37.4326838638))
            ThreePointArc((556.8725494042, -37.4326838638), (557.6763485772, -38.3304783181), (557.9667741758, -39.5))
            ThreePointArc((557.9667741758, -39.5), (557.2345411287, -41.267766953), (555.4667741758, -42))
            Line((555.4667741758, -42), (563.589190781, -42))
        make_face()
        with BuildLine():
            ThreePointArc((516.089190781, -42), (514.321423828, -41.267766953), (513.589190781, -39.5))
            Line((513.589190781, -39.5), (513.589190781, -42))
            Line((513.589190781, -42), (516.089190781, -42))
        make_face()
    extrude(amount=F1_DEPTH)


solid = f1.part
